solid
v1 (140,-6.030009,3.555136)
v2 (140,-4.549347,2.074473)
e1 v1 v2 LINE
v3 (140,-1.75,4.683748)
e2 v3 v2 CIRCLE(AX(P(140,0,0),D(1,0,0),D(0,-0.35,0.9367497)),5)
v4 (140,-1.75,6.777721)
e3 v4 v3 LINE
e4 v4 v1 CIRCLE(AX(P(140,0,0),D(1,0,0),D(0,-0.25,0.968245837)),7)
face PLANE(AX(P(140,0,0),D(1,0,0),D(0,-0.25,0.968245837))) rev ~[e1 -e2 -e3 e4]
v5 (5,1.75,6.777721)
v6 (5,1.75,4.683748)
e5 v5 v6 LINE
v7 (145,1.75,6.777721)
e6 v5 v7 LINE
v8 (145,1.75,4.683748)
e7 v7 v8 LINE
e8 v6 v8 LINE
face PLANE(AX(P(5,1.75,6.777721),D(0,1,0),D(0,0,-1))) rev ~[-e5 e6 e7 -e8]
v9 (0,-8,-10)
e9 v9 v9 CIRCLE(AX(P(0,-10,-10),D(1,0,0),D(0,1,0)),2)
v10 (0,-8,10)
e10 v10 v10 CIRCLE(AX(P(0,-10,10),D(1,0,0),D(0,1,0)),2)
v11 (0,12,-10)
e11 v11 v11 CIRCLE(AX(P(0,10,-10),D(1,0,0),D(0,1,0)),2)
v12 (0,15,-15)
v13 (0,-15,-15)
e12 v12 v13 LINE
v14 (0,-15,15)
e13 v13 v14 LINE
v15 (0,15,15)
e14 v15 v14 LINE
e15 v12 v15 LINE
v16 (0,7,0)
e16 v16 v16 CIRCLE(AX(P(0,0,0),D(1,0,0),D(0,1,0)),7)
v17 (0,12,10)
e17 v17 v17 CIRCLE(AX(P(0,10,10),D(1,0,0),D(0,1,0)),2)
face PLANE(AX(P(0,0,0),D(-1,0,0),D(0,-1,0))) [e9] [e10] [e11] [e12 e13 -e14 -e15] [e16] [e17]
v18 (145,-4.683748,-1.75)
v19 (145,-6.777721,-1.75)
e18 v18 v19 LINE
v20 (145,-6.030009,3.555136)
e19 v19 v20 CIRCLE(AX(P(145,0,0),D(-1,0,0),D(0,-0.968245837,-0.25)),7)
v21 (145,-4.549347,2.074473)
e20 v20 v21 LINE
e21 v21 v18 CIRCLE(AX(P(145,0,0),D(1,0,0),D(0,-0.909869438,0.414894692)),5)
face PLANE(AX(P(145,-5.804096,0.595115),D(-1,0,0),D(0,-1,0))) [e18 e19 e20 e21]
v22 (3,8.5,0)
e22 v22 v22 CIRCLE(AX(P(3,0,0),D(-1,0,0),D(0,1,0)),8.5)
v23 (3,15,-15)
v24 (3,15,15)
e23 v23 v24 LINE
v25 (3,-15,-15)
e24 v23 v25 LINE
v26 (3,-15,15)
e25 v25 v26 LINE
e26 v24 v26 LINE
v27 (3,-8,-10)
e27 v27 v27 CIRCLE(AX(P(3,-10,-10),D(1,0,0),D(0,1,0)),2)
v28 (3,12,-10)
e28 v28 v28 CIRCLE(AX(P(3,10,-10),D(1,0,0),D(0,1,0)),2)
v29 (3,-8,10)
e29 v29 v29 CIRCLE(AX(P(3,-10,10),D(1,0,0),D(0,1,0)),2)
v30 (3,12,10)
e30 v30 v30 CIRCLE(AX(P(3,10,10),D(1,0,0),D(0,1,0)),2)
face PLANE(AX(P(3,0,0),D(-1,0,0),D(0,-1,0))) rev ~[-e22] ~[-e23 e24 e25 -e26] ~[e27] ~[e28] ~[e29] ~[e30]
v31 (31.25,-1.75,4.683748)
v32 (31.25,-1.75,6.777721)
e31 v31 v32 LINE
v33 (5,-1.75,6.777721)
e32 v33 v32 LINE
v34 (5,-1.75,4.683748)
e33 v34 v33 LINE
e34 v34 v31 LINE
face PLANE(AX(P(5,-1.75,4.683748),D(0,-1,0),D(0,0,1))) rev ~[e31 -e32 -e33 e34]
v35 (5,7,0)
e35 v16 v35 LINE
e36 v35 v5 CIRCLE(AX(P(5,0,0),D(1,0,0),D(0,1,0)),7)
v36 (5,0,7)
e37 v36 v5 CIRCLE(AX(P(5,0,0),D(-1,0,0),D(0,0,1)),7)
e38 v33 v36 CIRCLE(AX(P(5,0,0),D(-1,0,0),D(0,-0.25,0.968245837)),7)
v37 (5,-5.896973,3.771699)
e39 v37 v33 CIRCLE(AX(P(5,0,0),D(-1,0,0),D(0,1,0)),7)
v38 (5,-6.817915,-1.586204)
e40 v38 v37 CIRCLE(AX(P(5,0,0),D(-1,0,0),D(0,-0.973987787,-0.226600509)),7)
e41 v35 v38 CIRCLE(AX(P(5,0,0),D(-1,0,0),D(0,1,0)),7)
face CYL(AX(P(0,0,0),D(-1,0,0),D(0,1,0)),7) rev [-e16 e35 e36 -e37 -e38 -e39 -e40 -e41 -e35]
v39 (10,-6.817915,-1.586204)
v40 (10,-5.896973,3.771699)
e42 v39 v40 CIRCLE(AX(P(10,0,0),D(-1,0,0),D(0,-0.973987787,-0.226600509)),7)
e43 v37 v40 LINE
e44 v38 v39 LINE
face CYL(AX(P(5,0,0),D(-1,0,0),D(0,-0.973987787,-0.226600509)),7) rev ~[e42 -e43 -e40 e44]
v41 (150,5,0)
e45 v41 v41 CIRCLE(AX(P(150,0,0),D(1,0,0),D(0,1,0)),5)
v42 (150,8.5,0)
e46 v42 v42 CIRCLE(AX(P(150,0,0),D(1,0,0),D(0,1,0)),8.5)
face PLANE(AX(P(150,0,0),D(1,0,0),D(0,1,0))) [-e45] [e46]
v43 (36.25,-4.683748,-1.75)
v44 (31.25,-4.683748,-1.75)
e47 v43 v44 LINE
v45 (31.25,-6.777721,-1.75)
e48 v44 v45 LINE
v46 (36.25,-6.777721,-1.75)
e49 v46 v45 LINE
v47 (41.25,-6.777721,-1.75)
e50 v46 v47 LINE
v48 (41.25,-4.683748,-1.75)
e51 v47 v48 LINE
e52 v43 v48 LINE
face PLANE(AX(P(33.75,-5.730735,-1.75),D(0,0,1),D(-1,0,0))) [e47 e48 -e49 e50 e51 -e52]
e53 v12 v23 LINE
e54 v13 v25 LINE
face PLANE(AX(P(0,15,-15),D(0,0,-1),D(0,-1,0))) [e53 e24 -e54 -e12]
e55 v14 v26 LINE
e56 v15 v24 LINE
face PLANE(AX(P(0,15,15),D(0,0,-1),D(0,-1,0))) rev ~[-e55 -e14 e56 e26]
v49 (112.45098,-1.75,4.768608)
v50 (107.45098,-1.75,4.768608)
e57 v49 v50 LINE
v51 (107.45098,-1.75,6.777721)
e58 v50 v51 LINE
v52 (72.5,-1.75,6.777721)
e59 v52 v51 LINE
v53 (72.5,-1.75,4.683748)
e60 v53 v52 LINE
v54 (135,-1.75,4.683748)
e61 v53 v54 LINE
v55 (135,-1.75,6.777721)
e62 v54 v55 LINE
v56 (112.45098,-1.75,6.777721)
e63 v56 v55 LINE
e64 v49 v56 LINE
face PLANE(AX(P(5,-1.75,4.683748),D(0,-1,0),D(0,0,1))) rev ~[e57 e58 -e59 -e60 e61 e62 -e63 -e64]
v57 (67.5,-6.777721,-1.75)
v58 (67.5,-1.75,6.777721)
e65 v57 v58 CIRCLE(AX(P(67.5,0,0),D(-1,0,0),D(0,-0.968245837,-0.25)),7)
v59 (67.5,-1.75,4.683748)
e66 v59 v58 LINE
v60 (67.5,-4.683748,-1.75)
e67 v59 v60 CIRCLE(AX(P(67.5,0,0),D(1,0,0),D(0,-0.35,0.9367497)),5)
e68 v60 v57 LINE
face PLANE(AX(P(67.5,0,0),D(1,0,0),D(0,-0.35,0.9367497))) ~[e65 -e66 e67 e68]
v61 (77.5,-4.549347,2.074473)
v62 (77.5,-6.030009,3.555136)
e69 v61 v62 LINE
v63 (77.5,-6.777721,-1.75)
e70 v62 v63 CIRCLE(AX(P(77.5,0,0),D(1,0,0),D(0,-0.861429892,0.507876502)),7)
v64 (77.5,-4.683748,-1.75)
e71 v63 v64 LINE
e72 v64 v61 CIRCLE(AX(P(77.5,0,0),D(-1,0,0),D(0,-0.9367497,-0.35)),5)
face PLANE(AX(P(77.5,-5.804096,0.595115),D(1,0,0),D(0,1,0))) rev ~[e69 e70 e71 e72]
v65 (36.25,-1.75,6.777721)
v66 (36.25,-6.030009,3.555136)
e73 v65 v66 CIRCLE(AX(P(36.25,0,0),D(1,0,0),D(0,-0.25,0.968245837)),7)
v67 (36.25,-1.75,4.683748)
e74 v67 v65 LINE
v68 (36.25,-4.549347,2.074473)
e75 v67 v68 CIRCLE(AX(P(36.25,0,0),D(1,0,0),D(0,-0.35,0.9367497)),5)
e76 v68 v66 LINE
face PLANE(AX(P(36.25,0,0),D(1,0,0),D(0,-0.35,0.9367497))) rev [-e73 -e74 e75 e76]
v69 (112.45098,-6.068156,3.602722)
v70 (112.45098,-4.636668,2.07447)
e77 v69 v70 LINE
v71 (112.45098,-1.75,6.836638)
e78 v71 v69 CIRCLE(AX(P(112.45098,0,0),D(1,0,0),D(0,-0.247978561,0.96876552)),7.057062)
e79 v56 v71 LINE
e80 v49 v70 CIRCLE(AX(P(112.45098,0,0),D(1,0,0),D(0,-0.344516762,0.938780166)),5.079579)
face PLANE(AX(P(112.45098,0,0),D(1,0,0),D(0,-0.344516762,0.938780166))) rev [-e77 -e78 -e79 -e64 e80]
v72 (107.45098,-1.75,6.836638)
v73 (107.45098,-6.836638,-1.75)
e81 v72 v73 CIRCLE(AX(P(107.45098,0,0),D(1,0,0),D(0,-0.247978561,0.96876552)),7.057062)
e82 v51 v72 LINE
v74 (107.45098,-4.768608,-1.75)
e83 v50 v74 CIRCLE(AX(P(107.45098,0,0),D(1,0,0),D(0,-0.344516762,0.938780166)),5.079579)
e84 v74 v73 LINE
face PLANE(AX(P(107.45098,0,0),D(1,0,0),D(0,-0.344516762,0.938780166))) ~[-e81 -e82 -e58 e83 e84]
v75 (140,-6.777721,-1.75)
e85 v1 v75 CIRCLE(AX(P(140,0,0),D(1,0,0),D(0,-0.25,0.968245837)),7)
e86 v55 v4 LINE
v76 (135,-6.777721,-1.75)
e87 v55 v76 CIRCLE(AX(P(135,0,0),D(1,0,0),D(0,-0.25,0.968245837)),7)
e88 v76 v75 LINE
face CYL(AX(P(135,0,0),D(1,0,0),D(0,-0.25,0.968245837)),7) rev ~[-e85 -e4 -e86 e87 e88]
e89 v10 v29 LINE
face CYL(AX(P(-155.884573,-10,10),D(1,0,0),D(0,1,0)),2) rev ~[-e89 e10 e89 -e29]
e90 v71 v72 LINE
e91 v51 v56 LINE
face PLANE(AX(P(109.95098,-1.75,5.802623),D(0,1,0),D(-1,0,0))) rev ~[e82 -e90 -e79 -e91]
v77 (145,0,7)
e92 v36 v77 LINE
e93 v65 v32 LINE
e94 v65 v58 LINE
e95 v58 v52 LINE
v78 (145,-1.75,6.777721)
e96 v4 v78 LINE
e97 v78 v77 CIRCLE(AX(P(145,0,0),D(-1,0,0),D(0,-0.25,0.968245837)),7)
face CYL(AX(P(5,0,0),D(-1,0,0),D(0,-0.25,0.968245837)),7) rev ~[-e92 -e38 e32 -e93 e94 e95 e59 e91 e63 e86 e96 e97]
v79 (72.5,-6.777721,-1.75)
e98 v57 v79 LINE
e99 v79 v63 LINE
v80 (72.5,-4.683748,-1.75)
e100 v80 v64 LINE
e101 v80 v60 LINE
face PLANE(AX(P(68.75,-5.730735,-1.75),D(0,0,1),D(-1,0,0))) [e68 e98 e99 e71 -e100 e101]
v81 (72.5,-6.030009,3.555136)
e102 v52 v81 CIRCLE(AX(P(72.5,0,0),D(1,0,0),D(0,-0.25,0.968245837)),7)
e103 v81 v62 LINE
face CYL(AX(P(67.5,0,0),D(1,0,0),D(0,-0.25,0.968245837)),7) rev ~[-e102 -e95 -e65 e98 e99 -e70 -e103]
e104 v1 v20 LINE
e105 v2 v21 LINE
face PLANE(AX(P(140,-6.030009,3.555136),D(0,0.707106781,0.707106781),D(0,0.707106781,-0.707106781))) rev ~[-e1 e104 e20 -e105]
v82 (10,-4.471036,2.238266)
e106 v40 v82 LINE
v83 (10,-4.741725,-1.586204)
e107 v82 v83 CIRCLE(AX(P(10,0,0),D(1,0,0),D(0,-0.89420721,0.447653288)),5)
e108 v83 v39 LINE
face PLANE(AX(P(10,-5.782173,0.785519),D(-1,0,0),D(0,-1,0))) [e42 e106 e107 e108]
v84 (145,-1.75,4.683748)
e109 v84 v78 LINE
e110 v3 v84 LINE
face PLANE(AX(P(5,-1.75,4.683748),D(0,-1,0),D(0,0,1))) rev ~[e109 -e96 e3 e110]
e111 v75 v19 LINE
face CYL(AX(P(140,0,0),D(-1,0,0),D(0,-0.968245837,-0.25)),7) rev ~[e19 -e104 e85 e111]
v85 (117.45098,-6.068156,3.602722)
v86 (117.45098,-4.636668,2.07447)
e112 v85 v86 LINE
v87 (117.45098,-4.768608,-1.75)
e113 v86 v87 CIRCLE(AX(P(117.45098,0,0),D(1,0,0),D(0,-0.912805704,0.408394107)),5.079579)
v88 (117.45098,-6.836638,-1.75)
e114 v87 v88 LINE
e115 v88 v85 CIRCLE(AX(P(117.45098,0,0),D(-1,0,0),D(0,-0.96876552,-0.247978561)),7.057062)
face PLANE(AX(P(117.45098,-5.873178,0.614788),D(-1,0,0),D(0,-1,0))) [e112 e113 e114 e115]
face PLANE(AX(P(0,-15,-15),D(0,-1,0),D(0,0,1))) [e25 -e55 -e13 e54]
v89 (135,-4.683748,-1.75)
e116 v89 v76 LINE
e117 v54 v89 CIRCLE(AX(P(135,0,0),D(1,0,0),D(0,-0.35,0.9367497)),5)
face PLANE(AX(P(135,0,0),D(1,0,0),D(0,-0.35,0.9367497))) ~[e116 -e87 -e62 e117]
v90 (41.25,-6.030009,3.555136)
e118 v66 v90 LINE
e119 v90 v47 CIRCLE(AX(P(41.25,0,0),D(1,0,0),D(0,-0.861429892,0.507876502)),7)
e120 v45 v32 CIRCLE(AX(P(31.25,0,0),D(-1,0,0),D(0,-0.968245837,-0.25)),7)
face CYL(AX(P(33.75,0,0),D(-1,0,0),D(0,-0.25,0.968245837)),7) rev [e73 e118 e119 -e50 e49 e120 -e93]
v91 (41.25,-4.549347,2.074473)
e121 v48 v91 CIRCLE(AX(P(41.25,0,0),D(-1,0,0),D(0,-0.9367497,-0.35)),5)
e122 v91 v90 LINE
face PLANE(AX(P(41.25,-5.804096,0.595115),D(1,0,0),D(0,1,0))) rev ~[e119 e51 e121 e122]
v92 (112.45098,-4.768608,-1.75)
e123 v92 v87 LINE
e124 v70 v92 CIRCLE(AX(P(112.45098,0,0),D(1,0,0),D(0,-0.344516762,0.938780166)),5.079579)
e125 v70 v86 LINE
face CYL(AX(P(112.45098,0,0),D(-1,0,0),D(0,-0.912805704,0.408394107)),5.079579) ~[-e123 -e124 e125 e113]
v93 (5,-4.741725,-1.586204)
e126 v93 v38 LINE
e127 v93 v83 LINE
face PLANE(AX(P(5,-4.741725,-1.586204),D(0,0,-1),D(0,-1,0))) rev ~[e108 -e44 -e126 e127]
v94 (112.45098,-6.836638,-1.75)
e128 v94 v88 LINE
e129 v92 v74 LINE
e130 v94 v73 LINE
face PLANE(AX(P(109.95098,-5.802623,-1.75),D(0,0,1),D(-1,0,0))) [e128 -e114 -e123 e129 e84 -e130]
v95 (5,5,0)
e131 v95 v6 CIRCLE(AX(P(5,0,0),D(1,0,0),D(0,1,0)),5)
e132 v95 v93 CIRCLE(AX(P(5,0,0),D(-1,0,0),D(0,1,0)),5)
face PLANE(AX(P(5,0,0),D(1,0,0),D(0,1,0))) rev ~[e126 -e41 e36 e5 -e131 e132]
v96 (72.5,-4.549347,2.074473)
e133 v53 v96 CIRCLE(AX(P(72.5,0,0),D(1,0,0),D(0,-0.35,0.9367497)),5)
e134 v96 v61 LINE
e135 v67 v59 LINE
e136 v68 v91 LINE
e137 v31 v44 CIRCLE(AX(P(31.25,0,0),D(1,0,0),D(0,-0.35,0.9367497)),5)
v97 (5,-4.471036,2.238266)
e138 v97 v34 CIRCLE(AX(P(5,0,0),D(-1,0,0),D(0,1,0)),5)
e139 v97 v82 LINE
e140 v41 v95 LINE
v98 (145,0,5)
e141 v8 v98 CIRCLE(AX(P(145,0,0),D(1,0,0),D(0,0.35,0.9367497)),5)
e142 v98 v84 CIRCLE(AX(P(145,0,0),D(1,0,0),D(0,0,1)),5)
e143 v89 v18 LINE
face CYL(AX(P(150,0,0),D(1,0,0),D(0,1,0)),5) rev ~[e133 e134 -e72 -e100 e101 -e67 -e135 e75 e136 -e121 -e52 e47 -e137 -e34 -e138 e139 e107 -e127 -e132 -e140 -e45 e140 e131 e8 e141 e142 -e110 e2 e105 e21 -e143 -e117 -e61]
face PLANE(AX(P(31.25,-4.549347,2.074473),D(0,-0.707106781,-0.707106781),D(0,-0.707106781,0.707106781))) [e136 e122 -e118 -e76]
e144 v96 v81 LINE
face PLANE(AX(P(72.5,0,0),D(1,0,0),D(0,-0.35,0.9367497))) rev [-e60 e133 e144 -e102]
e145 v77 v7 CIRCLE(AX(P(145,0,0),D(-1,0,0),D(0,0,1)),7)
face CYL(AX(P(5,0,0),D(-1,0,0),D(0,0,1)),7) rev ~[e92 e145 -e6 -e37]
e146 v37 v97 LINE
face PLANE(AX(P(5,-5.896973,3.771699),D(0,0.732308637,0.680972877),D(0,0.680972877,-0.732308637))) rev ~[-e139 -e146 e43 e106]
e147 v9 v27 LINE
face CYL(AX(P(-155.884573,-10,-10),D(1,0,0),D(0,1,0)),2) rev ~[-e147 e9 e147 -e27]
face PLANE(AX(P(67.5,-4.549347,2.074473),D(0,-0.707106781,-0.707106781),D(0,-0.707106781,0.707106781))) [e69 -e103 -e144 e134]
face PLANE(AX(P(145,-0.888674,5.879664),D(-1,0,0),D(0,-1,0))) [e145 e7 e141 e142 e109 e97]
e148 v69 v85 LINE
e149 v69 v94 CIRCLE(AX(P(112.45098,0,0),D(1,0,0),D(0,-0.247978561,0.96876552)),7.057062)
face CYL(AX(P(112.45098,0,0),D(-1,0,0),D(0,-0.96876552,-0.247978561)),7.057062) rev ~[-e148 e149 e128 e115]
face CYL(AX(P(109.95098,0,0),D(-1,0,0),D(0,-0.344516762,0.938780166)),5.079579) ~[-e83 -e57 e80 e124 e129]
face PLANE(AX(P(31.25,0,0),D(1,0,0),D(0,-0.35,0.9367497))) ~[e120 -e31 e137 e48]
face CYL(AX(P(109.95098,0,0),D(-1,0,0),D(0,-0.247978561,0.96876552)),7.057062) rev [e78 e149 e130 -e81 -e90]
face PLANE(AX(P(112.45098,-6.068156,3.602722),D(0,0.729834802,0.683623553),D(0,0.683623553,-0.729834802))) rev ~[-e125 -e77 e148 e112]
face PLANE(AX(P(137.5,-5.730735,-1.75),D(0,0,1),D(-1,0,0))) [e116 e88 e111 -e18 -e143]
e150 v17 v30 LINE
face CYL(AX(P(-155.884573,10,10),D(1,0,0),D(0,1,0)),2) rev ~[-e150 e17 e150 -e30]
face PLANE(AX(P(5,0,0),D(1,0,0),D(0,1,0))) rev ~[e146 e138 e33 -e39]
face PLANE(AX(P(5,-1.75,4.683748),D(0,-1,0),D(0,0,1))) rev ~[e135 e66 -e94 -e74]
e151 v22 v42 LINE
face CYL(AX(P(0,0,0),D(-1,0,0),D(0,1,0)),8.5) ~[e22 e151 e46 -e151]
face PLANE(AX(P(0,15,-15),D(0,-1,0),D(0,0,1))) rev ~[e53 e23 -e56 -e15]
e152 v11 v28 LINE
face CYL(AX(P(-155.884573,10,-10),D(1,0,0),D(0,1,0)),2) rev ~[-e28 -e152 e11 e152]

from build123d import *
from build123d import SkipClean  # not in build123d's __all__

# Parameters (mm, degrees)
F0_R      = 8.5
F0_R_2    = 7
F1_DEPTH  = 150
F2_R      = 7
F2_R_2    = 5
F3_DEPTH  = 145
F4_W      = 30
F4_H      = 30
F4_R      = 8.5
F5_DEPTH  = 3
F7_D      = 4
F9_DEPTH  = 140
F12_ANGLE = 90
F14_DEPTH = 5
F15_W     = 2.5
F15_H     = 2.0939723571
F16_ANGLE = 90
F18_DEPTH = 10
F19_W     = 5
F19_H     = 2.0680303106
F20_ANGLE = 90
F22_DEPTH = 5
F23_W     = 5
F23_H     = 2.0939723571
F24_ANGLE = 90
F26_DEPTH = 10
F27_W     = 5
F27_H     = 2.0939723571
F28_ANGLE = 90
F30_DEPTH = 5


# Not quite as in the source:
# - after a boolean that leaves OpenCascade's solid faulty, fix() repairs it


with BuildPart() as f1:
    # F0 (on Right) → F1 (new body)
    with BuildSketch(Plane.YZ):
        Circle(F0_R)
        Circle(F0_R_2, mode=Mode.SUBTRACT)
    extrude(amount=F1_DEPTH)

    # F2 (on face) → F3 (join)
    with BuildSketch(Plane.YZ.offset(150)):
        Circle(F2_R)
        Circle(F2_R_2, mode=Mode.SUBTRACT)
    extrude(amount=-F3_DEPTH)

    # F4 (on face) → F5 (join)
    with BuildSketch(Plane(origin=(0, 0, 0), x_dir=(0, -1, 0), z_dir=(-1, 0, 0))):
        Rectangle(F4_W, F4_H)
        Circle(F4_R, mode=Mode.SUBTRACT)
    extrude(amount=-F5_DEPTH)

    # F7 (through all)
    with Locations(Plane(origin=(0, 0, 0), x_dir=(0, -1, 0), z_dir=(-1, 0, 0))):
        with Locations((-10, 10), (10, 10), (10, -10), (-10, -10)):
            Hole(F7_D / 2)

    # F8 (on face) → F9 (cut)
    with BuildSketch(Plane(origin=(5, 0, 0), x_dir=(0, -1, 0), z_dir=(-1, 0, 0))):
        with BuildLine():
            ThreePointArc((0, 5), (0.8891730726, 4.9203019467), (1.75, 4.6837484988))
            Line((1.75, 4.6837484988), (1.75, 6.7777208559))
            ThreePointArc((1.75, 6.7777208559), (0.8820300474, 6.9442078739), (0, 7))
            Line((0, 7), (0, 5))
        make_face()
        with BuildLine():
            ThreePointArc((-1.75, 4.6837484988), (-0.8891730726, 4.9203019467), (0, 5))
            Line((0, 5), (0, 7))
            ThreePointArc((0, 7), (-0.8820300474, 6.9442078739), (-1.75, 6.7777208559))
            Line((-1.75, 6.7777208559), (-1.75, 4.6837484988))
        make_face()
    extrude(amount=-F9_DEPTH, mode=Mode.SUBTRACT)

    # F10 (on face) → F12 (revolve, cut)
    with BuildSketch(Plane(origin=(0, -1.75, 0), x_dir=(-1, 0, 0), z_dir=(0, 1, 0))):
        Polygon((-140, 6.7777208559), (-140, 4.7096905453), (-140, 4.6837484988), (-135, 4.6837484988), (-135, 6.7777208559), align=None)
    revolve(axis=Axis((74.9857723713, 0, 0), (1, 0, 0)), revolution_arc=F12_ANGLE, mode=Mode.SUBTRACT)

    # F13 (on face) → F14 (cut)
    with BuildSketch(Plane(origin=(140, 0, 0), x_dir=(0, -1, 0), z_dir=(-1, 0, 0))):
        with BuildLine():
            Line((6.0300092452, 3.5551355111), (4.5493471919, 2.0744734578))
            ThreePointArc((4.5493471919, 2.0744734578), (4.9969153801, 0.17560377), (4.6837484988, -1.75))
            Line((4.6837484988, -1.75), (6.7777208559, -1.75))
            ThreePointArc((6.7777208559, -1.75), (6.9314935824, 0.9769322988), (6.0300092452, 3.5551355111))
        make_face()
    with SkipClean():  # cleaning this boolean's faces spoils the solid; the shape is the same uncleaned
        extrude(amount=-F14_DEPTH, mode=Mode.SUBTRACT)

    # F15 (on face) → F16 (revolve, cut)
    with BuildSketch(Plane(origin=(0, -1.75, 0), x_dir=(-1, 0, 0), z_dir=(0, 1, 0))):
        with Locations((-68.75, 5.7307346773)):
            Rectangle(F15_W, F15_H)
        with Locations((-71.25, 5.7307346773)):
            Rectangle(F15_W, F15_H)
    revolve(axis=Axis((74.9857723713, 0, 0), (1, 0, 0)), revolution_arc=F16_ANGLE, mode=Mode.SUBTRACT)

    add(f1.part.fix(), mode=Mode.REPLACE)

    # F17 (on face) → F18 (cut)
    with BuildSketch(Plane.YZ.offset(67.5)):
        with BuildLine():
            ThreePointArc((-4.6837484988, -1.75), (-4.9969153801, 0.17560377), (-4.5493471919, 2.0744734578))
            Line((-4.5493471919, 2.0744734578), (-6.0300092452, 3.5551355111))
            ThreePointArc((-6.0300092452, 3.5551355111), (-6.9314935824, 0.9769322988), (-6.7777208559, -1.75))
            Line((-6.7777208559, -1.75), (-4.6837484988, -1.75))
        make_face()
    extrude(amount=F18_DEPTH, mode=Mode.SUBTRACT)

    # F19 (on face) → F20 (revolve, cut)
    with BuildSketch(Plane(origin=(0, -1.75, 0), x_dir=(-1, 0, 0), z_dir=(0, 1, 0))):
        with Locations((-109.95097965, 5.8026228816)):
            Rectangle(F19_W, F19_H)
    revolve(axis=Axis((112.4786585569, 0, 0), (1, 0, 0)), revolution_arc=F20_ANGLE, mode=Mode.SUBTRACT)

    # F21 (on face) → F22 (cut)
    with BuildSketch(Plane(origin=(112.45097965, 0, 0), x_dir=(0, -1, 0), z_dir=(-1, 0, 0))):
        with BuildLine():
            ThreePointArc((6.8366380369, -1.75), (6.9854372426, 1.0028889159), (6.068155613, 3.6027221796))
            Line((6.068155613, 3.6027221796), (4.6366684016, 2.07447))
            ThreePointArc((4.6366684016, 2.07447), (5.0765586233, 0.1751347812), (4.7686077263, -1.75))
            Line((4.7686077263, -1.75), (6.8366380369, -1.75))
        make_face()
    extrude(amount=-F22_DEPTH, mode=Mode.SUBTRACT)

    # F23 (on face) → F24 (revolve, cut)
    with BuildSketch(Plane(origin=(0, -1.75, 0), x_dir=(-1, 0, 0), z_dir=(0, 1, 0))):
        with Locations((-33.75, 5.7307346773)):
            Rectangle(F23_W, F23_H)
    revolve(axis=Axis((74.9857723713, 0, 0), (1, 0, 0)), revolution_arc=F24_ANGLE, mode=Mode.SUBTRACT)

    # F25 (on face) → F26 (cut)
    with BuildSketch(Plane.YZ.offset(31.25)):
        with BuildLine():
            ThreePointArc((-4.6837484988, -1.75), (-4.9969153801, 0.17560377), (-4.5493471919, 2.0744734578))
            Line((-4.5493471919, 2.0744734578), (-6.0300092452, 3.5551355111))
            ThreePointArc((-6.0300092452, 3.5551355111), (-6.9314935824, 0.9769322988), (-6.7777208559, -1.75))
            Line((-6.7777208559, -1.75), (-4.6837484988, -1.75))
        make_face()
    extrude(amount=F26_DEPTH, mode=Mode.SUBTRACT)

    # F27 (on face) → F28 (revolve)
    with BuildSketch(Plane(origin=(0, -1.75, 0), x_dir=(-1, 0, 0), z_dir=(0, 1, 0))):
        with Locations((-7.5, 5.7307346773)):
            Rectangle(F27_W, F27_H)
    revolve(axis=Axis((74.9857723713, 0, 0), (1, 0, 0)), revolution_arc=F28_ANGLE)

    # F29 (on face) → F30 (cut)
    with BuildSketch(Plane(origin=(5, 0, 0), x_dir=(0, -1, 0), z_dir=(-1, 0, 0))):
        with BuildLine():
            Line((5.896972825, 3.7716987554), (4.4710360492, 2.2382664379))
            ThreePointArc((4.4710360492, 2.2382664379), (4.9875229666, 0.3530080143), (4.7417252408, -1.5862035621))
            Line((4.7417252408, -1.5862035621), (6.8179145096, -1.5862035621))
            ThreePointArc((6.8179145096, -1.5862035621), (6.8988310092, 1.185803823), (5.896972825, 3.7716987554))
        make_face()
    extrude(amount=-F30_DEPTH, mode=Mode.SUBTRACT)

    add(f1.part.fix(), mode=Mode.REPLACE)


solid = f1.part
